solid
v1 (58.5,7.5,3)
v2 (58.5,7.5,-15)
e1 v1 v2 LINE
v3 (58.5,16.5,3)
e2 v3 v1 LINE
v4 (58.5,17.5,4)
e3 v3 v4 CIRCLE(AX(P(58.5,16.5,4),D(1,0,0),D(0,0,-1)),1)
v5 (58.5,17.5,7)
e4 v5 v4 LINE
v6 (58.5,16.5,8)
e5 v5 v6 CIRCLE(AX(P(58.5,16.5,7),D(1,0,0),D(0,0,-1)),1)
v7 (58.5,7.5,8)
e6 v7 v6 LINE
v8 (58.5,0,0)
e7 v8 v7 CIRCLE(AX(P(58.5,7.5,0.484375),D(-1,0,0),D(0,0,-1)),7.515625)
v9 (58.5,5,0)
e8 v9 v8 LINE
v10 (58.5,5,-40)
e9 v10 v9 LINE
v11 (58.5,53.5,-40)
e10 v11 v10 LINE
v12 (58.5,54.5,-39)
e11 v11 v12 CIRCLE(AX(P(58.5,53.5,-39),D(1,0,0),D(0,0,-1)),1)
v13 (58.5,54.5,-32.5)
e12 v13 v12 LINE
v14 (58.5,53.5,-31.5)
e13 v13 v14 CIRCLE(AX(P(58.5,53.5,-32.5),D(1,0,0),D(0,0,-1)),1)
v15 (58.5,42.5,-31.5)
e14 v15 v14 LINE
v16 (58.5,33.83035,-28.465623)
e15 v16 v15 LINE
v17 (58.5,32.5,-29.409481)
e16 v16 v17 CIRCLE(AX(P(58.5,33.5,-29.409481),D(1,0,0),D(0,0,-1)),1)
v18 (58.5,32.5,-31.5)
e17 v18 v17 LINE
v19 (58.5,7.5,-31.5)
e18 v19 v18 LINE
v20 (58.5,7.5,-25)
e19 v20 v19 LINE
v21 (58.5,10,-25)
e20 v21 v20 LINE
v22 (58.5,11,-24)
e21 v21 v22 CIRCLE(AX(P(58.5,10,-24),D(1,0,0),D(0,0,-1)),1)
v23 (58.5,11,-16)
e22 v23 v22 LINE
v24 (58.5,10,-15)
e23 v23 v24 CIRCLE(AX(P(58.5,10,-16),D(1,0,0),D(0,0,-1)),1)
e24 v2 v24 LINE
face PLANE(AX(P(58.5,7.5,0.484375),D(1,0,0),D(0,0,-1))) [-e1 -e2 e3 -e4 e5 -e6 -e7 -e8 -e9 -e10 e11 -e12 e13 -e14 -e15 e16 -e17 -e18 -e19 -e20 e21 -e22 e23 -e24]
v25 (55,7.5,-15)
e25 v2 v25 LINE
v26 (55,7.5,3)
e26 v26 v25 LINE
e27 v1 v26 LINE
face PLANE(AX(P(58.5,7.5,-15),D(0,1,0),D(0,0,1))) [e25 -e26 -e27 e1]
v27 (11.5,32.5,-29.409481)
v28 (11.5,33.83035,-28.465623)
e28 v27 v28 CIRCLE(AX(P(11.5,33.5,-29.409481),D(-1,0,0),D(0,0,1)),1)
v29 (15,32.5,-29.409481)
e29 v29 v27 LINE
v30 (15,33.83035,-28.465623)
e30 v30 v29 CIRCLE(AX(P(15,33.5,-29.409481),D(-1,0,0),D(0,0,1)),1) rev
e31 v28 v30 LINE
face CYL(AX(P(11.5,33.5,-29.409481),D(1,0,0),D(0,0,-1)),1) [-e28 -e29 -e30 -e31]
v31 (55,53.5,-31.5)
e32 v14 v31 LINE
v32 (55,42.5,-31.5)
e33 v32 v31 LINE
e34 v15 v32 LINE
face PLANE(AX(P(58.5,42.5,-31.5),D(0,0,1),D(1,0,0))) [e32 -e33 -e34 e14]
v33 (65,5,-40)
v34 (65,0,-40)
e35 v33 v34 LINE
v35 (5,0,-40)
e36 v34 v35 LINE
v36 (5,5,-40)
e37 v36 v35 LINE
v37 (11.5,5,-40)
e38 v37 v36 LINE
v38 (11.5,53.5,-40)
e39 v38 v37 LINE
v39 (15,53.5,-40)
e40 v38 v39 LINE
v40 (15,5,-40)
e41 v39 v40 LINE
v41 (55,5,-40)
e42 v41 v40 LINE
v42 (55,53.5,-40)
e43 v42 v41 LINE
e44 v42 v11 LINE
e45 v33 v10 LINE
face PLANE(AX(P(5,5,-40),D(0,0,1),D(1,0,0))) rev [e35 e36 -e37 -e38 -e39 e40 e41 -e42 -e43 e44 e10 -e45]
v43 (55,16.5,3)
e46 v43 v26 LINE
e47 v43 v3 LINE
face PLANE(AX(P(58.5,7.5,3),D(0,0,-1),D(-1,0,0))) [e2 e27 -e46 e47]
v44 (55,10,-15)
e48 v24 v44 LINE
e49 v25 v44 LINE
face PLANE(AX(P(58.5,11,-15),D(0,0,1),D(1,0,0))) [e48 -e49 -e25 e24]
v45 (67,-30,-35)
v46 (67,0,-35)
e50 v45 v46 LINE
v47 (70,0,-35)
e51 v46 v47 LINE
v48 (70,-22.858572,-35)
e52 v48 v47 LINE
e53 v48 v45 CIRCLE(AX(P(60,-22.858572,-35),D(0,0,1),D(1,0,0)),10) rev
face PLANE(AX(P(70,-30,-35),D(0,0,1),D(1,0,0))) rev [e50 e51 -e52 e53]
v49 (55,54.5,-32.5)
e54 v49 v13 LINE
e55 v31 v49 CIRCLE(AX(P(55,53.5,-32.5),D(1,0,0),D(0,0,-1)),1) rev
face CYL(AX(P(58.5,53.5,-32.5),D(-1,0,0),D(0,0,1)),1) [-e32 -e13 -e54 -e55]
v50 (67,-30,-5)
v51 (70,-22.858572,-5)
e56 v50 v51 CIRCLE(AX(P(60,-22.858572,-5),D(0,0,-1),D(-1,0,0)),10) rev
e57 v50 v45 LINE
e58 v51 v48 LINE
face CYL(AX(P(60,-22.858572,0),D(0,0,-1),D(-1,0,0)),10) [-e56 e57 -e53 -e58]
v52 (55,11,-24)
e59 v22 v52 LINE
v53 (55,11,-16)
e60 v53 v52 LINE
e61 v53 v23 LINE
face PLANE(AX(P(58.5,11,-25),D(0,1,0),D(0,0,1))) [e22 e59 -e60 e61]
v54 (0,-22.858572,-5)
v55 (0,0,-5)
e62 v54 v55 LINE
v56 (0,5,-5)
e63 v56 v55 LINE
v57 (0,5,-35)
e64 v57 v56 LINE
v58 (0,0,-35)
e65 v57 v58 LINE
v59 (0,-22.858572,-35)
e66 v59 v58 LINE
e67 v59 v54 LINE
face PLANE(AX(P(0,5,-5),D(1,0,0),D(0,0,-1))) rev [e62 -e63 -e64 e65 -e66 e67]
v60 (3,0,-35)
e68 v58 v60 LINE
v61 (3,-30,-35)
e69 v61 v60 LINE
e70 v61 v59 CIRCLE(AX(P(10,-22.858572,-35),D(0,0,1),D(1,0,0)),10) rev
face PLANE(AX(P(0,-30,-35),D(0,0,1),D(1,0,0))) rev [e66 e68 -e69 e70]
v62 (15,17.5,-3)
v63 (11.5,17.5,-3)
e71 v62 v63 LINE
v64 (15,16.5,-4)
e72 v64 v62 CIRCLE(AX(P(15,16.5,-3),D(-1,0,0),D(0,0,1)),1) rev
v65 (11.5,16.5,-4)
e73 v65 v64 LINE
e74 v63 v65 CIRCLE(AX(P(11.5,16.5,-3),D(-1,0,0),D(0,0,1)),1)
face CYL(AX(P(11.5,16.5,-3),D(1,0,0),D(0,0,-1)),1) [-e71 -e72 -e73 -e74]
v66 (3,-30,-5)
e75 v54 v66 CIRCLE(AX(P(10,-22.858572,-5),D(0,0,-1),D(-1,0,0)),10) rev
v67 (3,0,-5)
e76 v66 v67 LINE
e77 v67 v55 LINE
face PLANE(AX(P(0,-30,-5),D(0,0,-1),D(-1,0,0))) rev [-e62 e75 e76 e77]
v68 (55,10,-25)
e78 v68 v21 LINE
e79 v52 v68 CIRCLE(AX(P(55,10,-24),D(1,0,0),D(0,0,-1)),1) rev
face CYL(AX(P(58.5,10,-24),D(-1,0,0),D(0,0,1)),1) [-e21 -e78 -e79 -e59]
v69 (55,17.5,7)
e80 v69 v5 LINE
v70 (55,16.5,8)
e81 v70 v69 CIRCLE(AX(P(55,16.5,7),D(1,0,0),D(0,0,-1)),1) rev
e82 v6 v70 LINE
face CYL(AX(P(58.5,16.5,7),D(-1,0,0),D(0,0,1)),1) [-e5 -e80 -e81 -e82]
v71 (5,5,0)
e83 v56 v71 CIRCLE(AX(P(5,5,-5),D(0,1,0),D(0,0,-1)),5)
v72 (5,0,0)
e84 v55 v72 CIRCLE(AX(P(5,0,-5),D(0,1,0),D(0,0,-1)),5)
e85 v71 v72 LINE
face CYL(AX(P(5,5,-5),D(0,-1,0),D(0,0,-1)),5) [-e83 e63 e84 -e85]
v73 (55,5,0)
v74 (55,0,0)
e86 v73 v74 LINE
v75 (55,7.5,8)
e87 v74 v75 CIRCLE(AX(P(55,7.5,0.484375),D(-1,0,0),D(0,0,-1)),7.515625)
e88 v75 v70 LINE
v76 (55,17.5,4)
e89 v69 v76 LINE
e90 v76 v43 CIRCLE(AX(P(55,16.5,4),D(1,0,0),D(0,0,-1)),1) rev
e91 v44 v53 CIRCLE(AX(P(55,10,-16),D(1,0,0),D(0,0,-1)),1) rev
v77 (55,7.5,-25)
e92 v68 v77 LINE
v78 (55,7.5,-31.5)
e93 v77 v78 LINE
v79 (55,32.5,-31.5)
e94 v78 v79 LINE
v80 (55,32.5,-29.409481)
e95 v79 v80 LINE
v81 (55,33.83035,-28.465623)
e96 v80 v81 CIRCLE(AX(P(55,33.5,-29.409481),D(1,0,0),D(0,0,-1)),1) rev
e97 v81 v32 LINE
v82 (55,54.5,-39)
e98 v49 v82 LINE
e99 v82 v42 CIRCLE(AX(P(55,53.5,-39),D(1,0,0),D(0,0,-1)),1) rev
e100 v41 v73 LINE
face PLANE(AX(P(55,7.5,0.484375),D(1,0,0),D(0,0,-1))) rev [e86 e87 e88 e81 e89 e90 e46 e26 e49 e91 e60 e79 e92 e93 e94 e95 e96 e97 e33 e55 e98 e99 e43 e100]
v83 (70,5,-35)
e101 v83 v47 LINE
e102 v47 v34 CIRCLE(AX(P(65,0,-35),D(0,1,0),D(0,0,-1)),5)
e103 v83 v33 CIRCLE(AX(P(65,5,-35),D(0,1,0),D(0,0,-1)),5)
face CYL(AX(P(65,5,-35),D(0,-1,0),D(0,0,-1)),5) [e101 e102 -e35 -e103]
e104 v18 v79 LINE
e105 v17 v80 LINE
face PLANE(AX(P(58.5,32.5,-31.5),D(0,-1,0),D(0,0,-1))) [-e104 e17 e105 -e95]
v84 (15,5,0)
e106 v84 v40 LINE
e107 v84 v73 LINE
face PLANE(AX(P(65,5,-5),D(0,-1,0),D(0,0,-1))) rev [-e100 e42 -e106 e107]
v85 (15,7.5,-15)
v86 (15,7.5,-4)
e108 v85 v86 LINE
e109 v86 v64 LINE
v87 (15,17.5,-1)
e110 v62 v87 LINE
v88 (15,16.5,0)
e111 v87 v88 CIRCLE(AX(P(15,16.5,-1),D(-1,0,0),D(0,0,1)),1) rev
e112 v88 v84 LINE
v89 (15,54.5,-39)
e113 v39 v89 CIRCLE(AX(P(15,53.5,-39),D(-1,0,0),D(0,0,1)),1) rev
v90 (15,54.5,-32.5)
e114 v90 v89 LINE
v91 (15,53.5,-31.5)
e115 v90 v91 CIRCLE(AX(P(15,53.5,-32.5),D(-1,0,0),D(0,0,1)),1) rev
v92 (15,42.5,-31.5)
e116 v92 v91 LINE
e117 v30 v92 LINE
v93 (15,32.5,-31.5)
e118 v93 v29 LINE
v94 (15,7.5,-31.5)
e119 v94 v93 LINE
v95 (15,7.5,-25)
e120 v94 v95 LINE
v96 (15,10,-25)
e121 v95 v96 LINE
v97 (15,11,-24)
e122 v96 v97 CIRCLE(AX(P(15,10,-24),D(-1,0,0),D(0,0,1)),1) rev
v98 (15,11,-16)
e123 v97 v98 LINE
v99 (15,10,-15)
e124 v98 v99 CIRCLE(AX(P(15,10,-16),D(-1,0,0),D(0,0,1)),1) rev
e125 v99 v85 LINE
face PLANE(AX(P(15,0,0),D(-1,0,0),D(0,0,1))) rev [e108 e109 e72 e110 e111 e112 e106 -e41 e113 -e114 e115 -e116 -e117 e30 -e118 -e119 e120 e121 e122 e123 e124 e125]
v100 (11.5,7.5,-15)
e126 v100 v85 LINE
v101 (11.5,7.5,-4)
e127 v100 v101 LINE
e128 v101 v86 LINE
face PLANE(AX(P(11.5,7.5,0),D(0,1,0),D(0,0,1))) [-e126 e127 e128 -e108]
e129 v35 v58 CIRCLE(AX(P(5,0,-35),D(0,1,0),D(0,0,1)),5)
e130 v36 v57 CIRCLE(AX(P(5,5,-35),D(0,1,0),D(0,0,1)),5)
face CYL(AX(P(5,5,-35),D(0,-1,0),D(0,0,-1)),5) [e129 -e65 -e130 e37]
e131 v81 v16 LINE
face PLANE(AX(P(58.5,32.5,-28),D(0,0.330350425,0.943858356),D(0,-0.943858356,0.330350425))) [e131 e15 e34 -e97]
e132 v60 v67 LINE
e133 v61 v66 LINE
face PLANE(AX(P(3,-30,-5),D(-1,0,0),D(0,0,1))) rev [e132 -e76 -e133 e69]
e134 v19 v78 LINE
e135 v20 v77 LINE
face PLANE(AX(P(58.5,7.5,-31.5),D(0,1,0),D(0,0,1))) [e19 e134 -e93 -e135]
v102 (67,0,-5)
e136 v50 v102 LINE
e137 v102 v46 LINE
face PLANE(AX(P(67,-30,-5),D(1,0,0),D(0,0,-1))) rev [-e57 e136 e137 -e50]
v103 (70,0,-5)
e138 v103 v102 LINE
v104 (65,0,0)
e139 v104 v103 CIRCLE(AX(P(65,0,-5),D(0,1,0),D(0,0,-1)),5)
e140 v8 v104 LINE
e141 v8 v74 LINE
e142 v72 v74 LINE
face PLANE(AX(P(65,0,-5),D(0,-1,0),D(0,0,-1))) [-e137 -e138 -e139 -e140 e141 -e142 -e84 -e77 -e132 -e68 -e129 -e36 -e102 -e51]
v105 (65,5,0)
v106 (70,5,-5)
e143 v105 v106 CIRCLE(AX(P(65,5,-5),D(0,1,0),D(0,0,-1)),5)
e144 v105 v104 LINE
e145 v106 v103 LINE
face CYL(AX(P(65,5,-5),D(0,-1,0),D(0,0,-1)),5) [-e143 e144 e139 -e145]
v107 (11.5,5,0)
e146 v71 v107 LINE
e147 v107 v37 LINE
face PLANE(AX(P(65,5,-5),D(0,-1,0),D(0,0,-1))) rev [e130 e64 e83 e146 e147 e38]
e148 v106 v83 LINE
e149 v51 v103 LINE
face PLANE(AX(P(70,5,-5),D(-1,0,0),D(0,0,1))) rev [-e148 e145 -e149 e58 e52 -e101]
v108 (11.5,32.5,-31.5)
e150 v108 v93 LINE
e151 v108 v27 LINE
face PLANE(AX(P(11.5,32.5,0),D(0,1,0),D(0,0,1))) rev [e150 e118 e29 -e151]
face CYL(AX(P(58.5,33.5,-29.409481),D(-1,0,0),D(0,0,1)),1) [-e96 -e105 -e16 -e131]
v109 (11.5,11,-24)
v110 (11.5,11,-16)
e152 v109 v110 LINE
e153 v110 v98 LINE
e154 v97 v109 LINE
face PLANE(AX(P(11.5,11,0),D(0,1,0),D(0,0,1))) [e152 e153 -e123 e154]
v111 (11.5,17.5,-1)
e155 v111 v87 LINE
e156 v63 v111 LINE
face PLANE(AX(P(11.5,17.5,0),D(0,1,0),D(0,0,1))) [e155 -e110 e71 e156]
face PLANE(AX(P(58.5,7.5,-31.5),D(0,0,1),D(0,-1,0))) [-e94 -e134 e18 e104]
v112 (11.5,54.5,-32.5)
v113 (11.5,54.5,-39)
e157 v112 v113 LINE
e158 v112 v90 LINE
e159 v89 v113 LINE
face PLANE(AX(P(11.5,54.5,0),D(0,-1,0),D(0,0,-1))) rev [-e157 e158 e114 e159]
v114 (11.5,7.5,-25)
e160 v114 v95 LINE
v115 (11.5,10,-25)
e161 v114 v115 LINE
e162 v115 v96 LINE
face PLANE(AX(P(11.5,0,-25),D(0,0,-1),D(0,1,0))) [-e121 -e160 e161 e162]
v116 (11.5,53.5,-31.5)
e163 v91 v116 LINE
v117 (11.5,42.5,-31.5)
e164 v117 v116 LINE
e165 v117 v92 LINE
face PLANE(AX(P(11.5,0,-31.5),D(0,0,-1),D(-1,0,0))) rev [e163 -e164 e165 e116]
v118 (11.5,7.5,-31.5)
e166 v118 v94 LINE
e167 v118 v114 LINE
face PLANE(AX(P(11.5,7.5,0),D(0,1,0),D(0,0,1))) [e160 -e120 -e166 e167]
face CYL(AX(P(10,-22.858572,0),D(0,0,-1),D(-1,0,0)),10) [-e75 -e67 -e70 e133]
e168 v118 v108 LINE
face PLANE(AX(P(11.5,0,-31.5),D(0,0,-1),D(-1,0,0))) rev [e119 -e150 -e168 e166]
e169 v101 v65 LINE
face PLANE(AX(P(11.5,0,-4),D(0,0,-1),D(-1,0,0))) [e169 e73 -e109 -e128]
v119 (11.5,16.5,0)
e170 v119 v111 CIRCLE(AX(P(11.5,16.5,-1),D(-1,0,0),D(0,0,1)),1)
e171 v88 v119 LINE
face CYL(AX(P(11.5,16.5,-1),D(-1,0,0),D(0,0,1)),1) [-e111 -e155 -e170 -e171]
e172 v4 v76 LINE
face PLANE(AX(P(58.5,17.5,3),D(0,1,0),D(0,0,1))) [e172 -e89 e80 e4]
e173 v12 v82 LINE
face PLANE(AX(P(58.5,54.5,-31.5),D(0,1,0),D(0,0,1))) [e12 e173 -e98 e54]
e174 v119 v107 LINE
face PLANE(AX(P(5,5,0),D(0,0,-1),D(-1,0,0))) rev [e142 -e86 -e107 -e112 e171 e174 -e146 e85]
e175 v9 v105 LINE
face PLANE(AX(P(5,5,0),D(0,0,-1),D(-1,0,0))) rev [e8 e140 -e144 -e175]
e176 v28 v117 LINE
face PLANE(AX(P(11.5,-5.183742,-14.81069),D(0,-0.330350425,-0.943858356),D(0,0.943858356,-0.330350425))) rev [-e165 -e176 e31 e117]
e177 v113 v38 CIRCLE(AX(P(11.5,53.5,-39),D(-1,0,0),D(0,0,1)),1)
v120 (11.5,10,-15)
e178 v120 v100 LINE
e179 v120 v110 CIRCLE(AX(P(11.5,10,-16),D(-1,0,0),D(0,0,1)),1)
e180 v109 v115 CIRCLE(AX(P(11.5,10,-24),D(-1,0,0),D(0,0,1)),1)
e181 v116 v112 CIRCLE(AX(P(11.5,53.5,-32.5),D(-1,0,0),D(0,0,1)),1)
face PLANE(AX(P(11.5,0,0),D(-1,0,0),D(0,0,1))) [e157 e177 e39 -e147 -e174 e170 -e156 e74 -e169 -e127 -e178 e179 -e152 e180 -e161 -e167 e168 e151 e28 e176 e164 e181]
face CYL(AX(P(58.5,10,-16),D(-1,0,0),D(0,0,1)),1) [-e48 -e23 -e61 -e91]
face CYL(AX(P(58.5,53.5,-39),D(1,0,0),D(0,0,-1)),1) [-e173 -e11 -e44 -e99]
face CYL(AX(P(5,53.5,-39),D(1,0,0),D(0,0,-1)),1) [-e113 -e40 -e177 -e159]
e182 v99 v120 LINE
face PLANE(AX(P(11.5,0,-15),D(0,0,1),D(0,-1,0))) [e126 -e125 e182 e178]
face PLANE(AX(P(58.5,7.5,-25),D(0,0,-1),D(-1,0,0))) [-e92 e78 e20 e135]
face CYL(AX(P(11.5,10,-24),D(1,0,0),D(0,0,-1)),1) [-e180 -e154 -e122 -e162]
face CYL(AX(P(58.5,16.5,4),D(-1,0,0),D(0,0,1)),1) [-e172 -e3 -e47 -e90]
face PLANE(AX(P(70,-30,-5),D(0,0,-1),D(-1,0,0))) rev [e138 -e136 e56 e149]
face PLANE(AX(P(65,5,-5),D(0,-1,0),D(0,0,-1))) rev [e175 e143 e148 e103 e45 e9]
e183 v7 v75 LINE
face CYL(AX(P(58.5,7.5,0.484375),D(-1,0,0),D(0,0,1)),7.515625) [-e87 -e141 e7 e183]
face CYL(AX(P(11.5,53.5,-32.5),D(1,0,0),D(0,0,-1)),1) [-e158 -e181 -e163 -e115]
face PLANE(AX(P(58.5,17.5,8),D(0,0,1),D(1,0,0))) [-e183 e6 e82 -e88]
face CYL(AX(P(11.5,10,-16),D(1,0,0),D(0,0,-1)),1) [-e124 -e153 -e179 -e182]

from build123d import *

# Parameters (mm, degrees)
BOSS_EXTRUDE1_DEPTH = 5
SKETCH2_W           = 3
SKETCH2_H           = 30
BOSS_EXTRUDE2_DEPTH = 30
FILLET1_R           = 10
BOSS_EXTRUDE3_DEPTH = 3.5
BOSS_EXTRUDE4_DEPTH = 3.5
FILLET2_R           = 1


with BuildPart() as part:
    # Sketch1 → Boss-Extrude1 (new body)
    with BuildSketch(Plane(origin=(0, 0, 0), x_dir=(1, 0, 0), z_dir=(0, 1, 0))):
        with BuildLine():
            Line((5, 0), (65, 0))
            ThreePointArc((65, 0), (68.535533906, 1.464466094), (70, 5))
            Line((70, 5), (70, 35))
            ThreePointArc((70, 35), (68.535533906, 38.535533906), (65, 40))
            Line((65, 40), (5, 40))
            ThreePointArc((5, 40), (1.464466094, 38.535533906), (0, 35))
            Line((0, 35), (0, 5))
            ThreePointArc((0, 5), (1.464466094, 1.464466094), (5, 0))
        make_face()
    extrude(amount=BOSS_EXTRUDE1_DEPTH)

    # Sketch2 → Boss-Extrude2 (add)
    with BuildSketch(Plane.XZ):
        with Locations((1.5, -20)):
            Rectangle(SKETCH2_W, SKETCH2_H)
        with Locations((68.5, -20)):
            Rectangle(SKETCH2_W, SKETCH2_H)
    extrude(amount=BOSS_EXTRUDE2_DEPTH)

    # Fillet1
    # the kernel refuses this fillet: 10 mm, written as the material it takes off along each edge
    with BuildSketch(Plane(origin=(0, -30, -52.853571071), x_dir=(0, 1, 0), z_dir=(0, 0, 1))) as fillet1_piece_1:
        with BuildLine():
            CenterArc((7.141428429, -10), FILLET1_R, 90, 45.572995999)
            Line((0, -3), (-0.142828569, -2.86))
            ThreePointArc((-0.142828569, -2.86), (-0.2, -1.5), (-0.2, 0))
            Line((-0.2, 0), (0, 0.2))
            Line((0, 0.2), (7.141428429, 0.2))
            Line((7.141428429, 0.2), (7.141428429, 0))
        make_face()
    extrude(amount=65.707142143, mode=Mode.SUBTRACT)
    with BuildSketch(Plane(origin=(70, -30, -52.853571071), x_dir=(0, 1, 0), z_dir=(0, 0, 1))) as fillet1_piece_2:
        with BuildLine():
            CenterArc((7.141428429, 10), FILLET1_R, 224.427004001, 45.572995999)
            Line((0, 3), (-0.142828569, 2.86))
            ThreePointArc((-0.142828569, 2.86), (-0.2, 1.5), (-0.2, 0))
            Line((-0.2, 0), (0, -0.2))
            Line((0, -0.2), (7.141428429, -0.2))
            Line((7.141428429, -0.2), (7.141428429, 0))
        make_face()
    extrude(amount=65.707142143, mode=Mode.SUBTRACT)

    # Sketch3 → Boss-Extrude3 (add)
    with BuildSketch(Plane.ZY.offset(-15)):
        Polygon((-25, 7.5), (-31.5, 7.5), (-31.5, 32.5), (-28, 32.5), (-31.5, 42.5), (-31.5, 54.5), (-40, 54.5), (-40, 5), (0, 5), (0, 17.5), (-4, 17.5), (-4, 7.5), (-15, 7.5), (-15, 11), (-25, 11), align=None)
    extrude(amount=BOSS_EXTRUDE3_DEPTH)

    # Sketch4 → Boss-Extrude4 (add)
    with BuildSketch(Plane.ZY.offset(-55)):
        with BuildLine():
            Line((-31.5, 7.5), (-31.5, 32.5))
            Line((-31.5, 32.5), (-28, 32.5))
            Line((-28, 32.5), (-31.5, 42.5))
            Line((-31.5, 42.5), (-31.5, 54.5))
            Line((-31.5, 54.5), (-40, 54.5))
            Line((-40, 54.5), (-40, 5))
            Line((-40, 5), (0, 5))
            Line((0, 5), (0, 0))
            ThreePointArc((0, 0), (5.624620047, 2.01707195), (8, 7.5))
            Line((8, 7.5), (8, 17.5))
            Line((8, 17.5), (3, 17.5))
            Line((3, 17.5), (3, 7.5))
            Line((3, 7.5), (-15, 7.5))
            Line((-15, 7.5), (-15, 11))
            Line((-15, 11), (-25, 11))
            Line((-25, 11), (-25, 7.5))
            Line((-25, 7.5), (-31.5, 7.5))
        make_face()
    extrude(amount=-BOSS_EXTRUDE4_DEPTH)

    # Fillet2
    fillet2_edges = [part.edges().sort_by_distance(p)[0] for p in [
        (56.75, 17.5, 3),
        (56.75, 17.5, 8),
        (56.75, 54.5, -40),
        (56.75, 54.5, -31.5),
        (56.75, 32.5, -28),
        (13.25, 54.5, -31.5),
        (13.25, 54.5, -40),
        (13.25, 17.5, 0),
        (13.25, 17.5, -4),
        (13.25, 11, -15),
        (13.25, 11, -25),
        (13.25, 32.5, -28),
        (56.75, 11, -25),
        (56.75, 11, -15),
    ]]
    fillet(fillet2_edges, radius=FILLET2_R)


solid = part.part
